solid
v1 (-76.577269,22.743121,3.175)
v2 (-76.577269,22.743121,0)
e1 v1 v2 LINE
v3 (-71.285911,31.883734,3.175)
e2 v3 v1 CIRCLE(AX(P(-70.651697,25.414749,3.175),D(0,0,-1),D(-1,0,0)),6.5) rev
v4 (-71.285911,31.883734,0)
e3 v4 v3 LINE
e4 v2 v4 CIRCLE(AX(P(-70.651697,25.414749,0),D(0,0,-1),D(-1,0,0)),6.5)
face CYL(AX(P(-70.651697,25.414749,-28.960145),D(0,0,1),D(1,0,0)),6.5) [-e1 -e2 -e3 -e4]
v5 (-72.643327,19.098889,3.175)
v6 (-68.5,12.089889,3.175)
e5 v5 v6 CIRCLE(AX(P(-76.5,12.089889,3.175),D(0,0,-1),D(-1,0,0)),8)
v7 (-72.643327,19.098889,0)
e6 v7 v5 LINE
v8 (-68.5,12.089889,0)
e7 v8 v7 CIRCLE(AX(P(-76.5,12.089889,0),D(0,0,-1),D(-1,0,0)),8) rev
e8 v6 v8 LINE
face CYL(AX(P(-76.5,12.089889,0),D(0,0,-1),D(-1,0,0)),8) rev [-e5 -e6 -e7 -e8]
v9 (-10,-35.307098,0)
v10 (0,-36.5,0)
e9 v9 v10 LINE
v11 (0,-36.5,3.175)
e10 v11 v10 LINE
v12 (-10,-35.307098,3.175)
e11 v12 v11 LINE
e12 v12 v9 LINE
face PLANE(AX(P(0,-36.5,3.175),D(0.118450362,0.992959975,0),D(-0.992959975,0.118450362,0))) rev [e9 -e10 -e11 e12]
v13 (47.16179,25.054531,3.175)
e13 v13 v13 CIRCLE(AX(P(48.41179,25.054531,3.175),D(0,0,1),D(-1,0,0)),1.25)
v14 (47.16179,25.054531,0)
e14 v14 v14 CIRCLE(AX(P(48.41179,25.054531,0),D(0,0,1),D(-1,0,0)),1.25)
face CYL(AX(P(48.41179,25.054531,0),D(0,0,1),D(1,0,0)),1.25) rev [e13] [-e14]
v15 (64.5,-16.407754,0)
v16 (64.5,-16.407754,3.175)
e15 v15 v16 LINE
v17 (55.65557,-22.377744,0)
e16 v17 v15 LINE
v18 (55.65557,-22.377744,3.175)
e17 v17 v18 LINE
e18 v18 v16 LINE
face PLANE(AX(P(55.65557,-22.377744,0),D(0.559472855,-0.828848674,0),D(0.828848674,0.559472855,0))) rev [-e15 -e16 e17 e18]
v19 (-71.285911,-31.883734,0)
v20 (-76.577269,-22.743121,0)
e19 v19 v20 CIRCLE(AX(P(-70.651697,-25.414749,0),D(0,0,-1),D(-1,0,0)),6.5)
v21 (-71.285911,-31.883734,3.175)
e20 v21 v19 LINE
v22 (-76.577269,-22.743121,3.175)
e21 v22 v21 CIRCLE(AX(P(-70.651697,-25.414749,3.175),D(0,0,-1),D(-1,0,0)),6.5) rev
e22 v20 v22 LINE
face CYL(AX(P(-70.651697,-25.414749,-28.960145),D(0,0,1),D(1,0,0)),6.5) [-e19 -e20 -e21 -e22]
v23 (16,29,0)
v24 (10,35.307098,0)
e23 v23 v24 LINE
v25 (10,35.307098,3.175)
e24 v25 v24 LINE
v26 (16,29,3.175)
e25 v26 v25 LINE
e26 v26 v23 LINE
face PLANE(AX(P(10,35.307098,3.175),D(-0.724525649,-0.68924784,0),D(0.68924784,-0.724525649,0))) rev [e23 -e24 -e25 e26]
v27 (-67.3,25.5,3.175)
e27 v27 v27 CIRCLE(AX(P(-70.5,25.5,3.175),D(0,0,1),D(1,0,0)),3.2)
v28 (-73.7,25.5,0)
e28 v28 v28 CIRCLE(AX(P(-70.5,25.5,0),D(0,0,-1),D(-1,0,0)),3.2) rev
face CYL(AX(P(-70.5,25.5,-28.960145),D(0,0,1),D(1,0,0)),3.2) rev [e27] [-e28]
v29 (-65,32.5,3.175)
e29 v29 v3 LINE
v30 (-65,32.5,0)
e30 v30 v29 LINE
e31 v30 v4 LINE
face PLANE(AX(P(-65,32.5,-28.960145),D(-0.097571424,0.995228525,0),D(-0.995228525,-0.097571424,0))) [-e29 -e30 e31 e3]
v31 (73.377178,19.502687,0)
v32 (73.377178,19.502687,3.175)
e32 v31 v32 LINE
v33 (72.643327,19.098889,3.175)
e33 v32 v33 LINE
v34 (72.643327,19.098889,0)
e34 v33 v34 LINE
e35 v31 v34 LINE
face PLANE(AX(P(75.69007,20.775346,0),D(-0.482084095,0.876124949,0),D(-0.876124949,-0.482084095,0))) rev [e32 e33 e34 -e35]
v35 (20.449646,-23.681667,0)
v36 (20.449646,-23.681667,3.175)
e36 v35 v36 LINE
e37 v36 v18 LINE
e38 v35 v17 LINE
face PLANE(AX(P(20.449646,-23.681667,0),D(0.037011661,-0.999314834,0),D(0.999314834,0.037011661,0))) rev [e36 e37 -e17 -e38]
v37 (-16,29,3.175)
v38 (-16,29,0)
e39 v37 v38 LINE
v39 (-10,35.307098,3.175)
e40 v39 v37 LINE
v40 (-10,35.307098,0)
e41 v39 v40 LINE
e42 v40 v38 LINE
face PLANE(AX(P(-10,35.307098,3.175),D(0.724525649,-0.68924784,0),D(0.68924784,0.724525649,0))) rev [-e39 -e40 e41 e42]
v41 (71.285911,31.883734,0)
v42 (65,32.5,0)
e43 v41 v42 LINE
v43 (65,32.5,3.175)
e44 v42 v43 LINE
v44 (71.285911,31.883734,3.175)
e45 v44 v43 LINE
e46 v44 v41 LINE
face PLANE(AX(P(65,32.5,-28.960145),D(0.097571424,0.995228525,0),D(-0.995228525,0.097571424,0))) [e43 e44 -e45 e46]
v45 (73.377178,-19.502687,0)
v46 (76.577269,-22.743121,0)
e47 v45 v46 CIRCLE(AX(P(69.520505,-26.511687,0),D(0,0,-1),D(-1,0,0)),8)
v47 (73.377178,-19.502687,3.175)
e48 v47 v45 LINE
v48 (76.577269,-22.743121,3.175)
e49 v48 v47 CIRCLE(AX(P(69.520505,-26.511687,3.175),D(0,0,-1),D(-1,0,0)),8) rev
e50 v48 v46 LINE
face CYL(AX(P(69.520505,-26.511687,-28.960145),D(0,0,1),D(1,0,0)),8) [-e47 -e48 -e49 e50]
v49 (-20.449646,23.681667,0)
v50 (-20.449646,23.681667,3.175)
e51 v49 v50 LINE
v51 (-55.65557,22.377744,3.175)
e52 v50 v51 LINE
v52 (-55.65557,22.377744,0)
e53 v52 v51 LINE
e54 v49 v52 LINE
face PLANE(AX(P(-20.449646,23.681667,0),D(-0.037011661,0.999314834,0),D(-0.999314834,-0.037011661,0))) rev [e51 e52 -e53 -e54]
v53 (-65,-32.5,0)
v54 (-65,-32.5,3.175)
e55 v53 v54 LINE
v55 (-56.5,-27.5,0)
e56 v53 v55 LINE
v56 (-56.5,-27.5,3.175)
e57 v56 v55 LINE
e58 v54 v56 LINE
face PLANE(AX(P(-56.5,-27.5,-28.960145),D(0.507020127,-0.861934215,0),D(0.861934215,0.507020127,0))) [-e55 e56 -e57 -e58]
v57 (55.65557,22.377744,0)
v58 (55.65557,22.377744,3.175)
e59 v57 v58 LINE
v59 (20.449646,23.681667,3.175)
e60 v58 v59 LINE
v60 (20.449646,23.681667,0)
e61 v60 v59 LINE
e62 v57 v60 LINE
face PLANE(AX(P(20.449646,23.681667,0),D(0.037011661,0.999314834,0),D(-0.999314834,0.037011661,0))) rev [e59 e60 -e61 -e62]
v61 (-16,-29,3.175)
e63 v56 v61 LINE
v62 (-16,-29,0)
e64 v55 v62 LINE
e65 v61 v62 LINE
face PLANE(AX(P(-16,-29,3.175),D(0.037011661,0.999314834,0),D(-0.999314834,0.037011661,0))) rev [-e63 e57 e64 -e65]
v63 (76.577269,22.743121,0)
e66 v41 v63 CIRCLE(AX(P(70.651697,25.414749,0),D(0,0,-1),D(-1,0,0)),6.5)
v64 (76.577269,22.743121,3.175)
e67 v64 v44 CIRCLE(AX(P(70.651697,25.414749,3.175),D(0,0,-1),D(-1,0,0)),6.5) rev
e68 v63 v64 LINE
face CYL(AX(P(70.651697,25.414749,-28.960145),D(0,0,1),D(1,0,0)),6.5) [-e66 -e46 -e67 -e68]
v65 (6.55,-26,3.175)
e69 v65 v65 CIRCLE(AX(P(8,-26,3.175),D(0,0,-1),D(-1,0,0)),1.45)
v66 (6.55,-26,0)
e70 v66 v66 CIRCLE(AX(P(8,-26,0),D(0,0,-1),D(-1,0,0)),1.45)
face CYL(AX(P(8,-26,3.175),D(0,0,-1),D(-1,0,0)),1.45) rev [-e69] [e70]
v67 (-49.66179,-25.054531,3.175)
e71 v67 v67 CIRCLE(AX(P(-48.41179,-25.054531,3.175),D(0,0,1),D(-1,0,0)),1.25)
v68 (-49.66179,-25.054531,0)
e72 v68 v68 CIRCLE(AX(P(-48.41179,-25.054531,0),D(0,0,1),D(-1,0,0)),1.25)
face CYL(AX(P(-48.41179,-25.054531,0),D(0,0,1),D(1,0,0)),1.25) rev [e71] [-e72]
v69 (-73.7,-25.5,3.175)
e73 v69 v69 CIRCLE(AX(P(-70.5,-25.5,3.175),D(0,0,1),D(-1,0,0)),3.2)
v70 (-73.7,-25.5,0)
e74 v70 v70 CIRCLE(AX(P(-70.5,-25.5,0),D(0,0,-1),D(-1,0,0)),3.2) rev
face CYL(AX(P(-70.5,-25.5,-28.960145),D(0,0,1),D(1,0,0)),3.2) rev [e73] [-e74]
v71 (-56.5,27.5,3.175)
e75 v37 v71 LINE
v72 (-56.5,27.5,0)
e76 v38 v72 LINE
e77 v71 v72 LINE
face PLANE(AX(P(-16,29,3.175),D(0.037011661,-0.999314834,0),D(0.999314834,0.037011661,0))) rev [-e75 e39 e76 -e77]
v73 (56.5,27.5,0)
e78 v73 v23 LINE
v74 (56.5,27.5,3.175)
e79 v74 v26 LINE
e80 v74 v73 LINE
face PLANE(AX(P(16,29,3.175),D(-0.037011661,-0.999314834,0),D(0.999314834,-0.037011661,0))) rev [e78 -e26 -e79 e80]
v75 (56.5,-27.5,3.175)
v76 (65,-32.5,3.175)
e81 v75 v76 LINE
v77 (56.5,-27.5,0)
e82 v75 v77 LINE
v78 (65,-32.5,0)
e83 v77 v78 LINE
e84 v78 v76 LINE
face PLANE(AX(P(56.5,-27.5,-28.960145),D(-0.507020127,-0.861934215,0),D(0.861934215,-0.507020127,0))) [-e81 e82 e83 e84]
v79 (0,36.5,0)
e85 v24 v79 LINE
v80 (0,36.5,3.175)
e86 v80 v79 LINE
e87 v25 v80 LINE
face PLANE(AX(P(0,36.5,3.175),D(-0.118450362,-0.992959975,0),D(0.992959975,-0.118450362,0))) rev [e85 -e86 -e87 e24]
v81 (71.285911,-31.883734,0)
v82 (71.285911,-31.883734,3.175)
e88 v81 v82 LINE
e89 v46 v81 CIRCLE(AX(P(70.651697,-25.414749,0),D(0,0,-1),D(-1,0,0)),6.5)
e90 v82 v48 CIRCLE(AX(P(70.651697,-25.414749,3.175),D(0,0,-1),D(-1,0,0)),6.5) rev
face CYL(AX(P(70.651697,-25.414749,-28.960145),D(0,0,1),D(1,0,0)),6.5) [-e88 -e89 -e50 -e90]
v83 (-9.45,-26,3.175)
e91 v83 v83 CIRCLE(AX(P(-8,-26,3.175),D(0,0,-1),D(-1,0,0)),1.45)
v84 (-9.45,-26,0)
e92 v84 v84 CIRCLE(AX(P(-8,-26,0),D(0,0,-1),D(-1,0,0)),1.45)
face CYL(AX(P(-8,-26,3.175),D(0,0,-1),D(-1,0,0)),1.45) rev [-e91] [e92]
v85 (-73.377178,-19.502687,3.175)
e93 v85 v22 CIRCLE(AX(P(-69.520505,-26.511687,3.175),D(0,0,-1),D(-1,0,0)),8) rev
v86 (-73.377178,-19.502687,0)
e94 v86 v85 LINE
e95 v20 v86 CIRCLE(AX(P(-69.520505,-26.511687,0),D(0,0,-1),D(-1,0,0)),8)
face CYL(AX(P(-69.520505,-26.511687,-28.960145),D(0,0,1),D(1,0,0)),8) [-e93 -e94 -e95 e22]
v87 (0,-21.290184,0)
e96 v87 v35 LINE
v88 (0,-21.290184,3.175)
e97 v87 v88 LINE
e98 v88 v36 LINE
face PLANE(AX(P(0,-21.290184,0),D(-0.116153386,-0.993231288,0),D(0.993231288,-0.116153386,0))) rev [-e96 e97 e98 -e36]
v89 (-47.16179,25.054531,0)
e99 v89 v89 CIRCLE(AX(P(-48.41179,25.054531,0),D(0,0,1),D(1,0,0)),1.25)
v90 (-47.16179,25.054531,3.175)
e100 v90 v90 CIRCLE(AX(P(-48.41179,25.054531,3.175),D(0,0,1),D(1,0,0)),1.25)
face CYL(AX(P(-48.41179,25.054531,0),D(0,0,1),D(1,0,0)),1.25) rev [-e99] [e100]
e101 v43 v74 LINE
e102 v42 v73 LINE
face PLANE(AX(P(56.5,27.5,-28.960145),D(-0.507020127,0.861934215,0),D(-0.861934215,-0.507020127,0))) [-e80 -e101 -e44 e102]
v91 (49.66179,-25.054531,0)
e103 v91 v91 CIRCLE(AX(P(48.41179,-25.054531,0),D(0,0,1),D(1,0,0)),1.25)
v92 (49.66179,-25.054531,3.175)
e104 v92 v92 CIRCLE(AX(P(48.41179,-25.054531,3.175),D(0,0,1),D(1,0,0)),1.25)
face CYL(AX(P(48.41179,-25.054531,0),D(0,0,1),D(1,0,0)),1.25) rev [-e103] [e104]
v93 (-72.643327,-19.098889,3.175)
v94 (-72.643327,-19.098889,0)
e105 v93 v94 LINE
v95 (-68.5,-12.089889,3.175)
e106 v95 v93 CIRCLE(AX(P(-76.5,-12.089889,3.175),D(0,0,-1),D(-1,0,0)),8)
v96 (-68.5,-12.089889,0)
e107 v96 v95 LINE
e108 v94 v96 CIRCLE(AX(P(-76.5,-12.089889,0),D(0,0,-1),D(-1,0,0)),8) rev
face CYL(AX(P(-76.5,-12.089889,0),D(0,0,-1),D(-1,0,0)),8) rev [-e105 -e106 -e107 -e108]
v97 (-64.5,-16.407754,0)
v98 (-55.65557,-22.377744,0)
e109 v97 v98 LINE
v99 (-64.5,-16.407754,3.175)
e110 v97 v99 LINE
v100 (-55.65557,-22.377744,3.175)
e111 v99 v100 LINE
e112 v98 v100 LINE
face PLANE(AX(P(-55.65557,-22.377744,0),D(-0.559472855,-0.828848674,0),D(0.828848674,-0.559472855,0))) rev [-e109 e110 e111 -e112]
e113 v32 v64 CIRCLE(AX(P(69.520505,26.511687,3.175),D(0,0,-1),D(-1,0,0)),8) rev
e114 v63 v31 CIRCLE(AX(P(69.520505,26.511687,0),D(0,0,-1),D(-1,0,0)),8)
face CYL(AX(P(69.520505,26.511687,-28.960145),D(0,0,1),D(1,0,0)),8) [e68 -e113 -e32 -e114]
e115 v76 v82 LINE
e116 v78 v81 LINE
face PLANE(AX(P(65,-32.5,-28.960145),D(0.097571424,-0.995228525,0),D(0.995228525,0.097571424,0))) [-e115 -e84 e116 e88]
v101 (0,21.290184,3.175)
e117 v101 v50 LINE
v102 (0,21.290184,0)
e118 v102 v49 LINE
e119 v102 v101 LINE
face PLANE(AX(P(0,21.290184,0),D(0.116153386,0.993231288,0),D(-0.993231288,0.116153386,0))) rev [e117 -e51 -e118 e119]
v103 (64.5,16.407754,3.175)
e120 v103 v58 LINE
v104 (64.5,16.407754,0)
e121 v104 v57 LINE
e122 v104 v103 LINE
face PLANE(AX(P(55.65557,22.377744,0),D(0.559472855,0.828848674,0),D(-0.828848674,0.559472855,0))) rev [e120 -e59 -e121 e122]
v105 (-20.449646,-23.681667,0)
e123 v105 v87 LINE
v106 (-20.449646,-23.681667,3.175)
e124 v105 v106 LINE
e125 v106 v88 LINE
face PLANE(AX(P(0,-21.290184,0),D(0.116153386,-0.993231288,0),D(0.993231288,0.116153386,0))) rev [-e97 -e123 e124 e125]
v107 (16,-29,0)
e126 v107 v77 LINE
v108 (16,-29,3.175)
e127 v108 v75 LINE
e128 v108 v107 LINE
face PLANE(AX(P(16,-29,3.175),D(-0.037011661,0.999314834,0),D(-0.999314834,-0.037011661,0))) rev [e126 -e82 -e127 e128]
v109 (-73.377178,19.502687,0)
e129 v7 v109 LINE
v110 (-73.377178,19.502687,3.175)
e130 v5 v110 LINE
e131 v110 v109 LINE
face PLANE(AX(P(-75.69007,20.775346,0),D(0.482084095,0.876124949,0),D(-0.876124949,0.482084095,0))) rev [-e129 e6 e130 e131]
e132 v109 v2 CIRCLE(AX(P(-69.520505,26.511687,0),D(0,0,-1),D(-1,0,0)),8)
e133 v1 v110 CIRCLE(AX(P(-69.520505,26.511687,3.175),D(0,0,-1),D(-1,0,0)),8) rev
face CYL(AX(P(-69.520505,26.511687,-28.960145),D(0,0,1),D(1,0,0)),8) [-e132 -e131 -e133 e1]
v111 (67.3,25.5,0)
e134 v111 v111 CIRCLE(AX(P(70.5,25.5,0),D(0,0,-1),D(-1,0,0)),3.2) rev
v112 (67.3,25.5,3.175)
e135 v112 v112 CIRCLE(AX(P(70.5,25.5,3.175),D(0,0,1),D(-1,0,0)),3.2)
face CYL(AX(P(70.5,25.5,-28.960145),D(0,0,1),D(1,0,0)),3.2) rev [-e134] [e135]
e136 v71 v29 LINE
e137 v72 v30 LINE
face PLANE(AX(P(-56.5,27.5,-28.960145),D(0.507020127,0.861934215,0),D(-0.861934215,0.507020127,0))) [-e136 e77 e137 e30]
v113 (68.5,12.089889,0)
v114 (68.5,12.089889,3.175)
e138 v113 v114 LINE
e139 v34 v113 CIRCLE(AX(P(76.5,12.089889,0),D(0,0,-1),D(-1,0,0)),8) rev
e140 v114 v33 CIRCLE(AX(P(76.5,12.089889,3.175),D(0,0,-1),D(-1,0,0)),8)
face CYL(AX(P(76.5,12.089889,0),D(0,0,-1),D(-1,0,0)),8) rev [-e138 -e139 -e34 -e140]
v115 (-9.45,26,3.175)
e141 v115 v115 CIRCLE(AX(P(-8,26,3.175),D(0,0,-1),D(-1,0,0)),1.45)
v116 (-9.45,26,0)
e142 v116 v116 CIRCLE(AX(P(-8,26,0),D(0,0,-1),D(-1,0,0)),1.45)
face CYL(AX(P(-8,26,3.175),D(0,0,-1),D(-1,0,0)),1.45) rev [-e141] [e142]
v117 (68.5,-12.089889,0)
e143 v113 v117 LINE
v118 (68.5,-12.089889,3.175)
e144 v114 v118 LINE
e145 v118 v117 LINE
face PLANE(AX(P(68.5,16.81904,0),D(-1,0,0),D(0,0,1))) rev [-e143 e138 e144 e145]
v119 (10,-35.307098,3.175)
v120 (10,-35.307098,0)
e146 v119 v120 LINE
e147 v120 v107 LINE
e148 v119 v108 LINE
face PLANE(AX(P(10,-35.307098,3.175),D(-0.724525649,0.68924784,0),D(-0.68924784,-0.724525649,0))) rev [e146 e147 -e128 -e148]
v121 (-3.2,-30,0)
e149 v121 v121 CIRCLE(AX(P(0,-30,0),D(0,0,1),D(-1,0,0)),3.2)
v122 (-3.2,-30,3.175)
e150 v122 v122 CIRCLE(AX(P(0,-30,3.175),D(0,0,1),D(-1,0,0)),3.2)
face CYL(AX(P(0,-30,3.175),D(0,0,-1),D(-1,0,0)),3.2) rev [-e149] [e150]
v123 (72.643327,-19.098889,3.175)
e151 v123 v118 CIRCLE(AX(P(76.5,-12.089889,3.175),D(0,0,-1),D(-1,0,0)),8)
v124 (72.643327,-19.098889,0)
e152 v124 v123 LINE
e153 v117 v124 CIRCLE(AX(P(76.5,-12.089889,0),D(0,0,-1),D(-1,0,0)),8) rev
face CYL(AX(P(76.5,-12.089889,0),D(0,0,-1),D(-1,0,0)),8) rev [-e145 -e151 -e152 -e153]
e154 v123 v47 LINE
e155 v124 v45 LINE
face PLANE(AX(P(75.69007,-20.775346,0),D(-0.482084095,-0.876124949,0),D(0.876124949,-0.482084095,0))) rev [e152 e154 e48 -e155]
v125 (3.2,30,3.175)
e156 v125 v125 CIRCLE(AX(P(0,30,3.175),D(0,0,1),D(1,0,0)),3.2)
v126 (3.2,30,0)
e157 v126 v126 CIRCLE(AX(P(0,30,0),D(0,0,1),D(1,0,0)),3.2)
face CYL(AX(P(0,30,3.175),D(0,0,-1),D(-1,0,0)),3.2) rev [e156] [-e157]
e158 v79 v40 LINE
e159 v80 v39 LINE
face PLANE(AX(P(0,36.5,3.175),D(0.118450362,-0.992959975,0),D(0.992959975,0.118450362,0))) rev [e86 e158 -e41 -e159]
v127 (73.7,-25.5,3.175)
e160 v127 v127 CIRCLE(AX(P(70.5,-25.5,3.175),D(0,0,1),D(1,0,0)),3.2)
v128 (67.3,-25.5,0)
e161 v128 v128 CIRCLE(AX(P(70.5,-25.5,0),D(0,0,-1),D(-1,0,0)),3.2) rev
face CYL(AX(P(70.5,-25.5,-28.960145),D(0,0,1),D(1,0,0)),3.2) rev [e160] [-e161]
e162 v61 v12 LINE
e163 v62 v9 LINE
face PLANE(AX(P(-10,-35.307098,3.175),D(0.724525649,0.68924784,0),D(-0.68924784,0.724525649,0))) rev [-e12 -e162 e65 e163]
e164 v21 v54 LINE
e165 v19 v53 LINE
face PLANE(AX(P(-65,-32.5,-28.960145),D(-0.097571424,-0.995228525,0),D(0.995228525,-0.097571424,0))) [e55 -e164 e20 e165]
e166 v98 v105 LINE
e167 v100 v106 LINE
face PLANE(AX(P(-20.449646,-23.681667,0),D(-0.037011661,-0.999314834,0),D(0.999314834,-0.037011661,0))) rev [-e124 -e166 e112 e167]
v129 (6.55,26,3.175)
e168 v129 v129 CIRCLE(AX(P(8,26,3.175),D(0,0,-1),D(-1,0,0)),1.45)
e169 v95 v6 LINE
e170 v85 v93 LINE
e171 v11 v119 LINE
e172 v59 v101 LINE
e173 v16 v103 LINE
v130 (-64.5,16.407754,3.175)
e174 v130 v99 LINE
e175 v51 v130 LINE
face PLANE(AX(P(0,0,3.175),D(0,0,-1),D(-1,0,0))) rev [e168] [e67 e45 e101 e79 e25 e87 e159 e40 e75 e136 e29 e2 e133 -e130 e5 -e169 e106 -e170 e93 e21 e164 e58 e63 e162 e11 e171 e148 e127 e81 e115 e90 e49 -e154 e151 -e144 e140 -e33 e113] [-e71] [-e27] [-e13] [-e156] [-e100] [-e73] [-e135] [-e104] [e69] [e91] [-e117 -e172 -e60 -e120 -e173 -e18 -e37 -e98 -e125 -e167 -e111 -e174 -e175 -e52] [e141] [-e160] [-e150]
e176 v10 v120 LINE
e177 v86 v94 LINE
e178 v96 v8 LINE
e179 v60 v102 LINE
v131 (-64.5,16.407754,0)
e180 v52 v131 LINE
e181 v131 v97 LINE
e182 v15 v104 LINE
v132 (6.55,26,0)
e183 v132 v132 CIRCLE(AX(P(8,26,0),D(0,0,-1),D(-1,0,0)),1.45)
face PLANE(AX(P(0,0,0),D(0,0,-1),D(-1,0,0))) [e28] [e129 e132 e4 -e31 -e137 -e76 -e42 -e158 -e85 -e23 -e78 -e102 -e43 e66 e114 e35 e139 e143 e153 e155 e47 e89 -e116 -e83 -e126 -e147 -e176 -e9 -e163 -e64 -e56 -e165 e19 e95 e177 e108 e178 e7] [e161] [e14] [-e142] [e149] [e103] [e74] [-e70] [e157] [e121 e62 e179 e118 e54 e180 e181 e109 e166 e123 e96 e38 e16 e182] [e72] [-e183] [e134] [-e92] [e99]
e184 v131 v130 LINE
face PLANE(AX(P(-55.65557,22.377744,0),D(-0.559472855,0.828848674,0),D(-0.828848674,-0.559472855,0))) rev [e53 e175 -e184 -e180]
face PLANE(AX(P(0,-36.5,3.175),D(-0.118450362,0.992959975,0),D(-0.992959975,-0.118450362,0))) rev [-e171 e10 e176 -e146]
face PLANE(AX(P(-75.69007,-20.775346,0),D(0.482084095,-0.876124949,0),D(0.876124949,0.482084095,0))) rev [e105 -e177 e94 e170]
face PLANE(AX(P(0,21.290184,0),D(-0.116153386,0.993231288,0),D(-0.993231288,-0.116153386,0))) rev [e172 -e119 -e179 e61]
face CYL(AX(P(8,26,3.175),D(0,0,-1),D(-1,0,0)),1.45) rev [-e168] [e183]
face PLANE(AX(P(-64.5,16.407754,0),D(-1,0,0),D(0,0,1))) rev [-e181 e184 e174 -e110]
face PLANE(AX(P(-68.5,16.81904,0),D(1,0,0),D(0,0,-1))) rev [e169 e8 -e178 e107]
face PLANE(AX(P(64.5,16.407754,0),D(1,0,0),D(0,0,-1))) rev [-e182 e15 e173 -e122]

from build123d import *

# Parameters (mm, degrees)
SKETCH1_R           = 3.2
BOSS_EXTRUDE1_DEPTH = 3.175
SKETCH3_R           = 3.2
BOSS_EXTRUDE2_DEPTH = 3.175
FILLET1_R           = 6.5
SKETCH6_R           = 1.45
CUT_EXTRUDE4_DEPTH  = 86.409103367
CUT_EXTRUDE14_DEPTH = 86.409103367
CUT_EXTRUDE13_DEPTH = 86.409103367
FILLET2_R           = 8
SKETCH9_R           = 1.25
CUT_EXTRUDE15_DEPTH = 86.409103367


with BuildPart() as part:
    # Sketch1 → Boss-Extrude1 (new body)
    with BuildSketch(Plane.XY):
        Polygon((0, 36.5), (-10, 35.30709832), (-16, 29), (-56.5, 27.5), (-76.5, 14), (-76.5, -14), (-56.5, -27.5), (-16, -29), (-10, -35.30709832), (0, -36.5), (10, -35.30709832), (16, -29), (56.5, -27.5), (76.5, -14), (76.5, 14), (56.5, 27.5), (16, 29), (10, 35.30709832), align=None)
        with Locations((0, 30)):
            Circle(SKETCH1_R, mode=Mode.SUBTRACT)
        with Locations(Location((0, -30, 0), (0, 0, 180))):
            Circle(SKETCH1_R, mode=Mode.SUBTRACT)
    extrude(amount=BOSS_EXTRUDE1_DEPTH)

    # Sketch3 → Boss-Extrude2 (add)
    # profile 1 of 4: a face of its own
    with BuildSketch(Plane.XY.offset(3.175)):
        Polygon((-56.5, 27.5), (-65, 32.5), (-80.3, 31), (-73.537037037, 16), align=None)
        with Locations((-70.5, 25.5)):
            Circle(SKETCH3_R, mode=Mode.SUBTRACT)
    # profile 2 of 4: a face of its own
    with BuildSketch(Plane.XY.offset(3.175)):
        Polygon((73.537037037, 16), (56.5, 27.5), (65, 32.5), (80.3, 31), align=None)
        with Locations(Location((70.5, 25.5, 0), (0, 0, 180))):
            Circle(SKETCH3_R, mode=Mode.SUBTRACT)
    # profile 3 of 4: a face of its own
    with BuildSketch(Plane.XY.offset(3.175)):
        Polygon((56.5, -27.5), (65, -32.5), (80.3, -31), (73.537037037, -16), align=None)
        with Locations((70.5, -25.5)):
            Circle(SKETCH3_R, mode=Mode.SUBTRACT)
    # profile 4 of 4: a face of its own
    with BuildSketch(Plane.XY.offset(3.175)):
        Polygon((-73.537037037, -16), (-56.5, -27.5), (-65, -32.5), (-80.3, -31), align=None)
        with Locations(Location((-70.5, -25.5, 0), (0, 0, 180))):
            Circle(SKETCH3_R, mode=Mode.SUBTRACT)
    extrude(amount=-BOSS_EXTRUDE2_DEPTH)

    # Fillet1
    fillet1_edges = [part.edges().sort_by_distance(p)[0] for p in [
        (-80.3, 31, 1.5875),
        (80.3, 31, 1.5875),
        (80.3, -31, 1.5875),
        (-80.3, -31, 1.5875),
    ]]
    fillet(fillet1_edges, radius=FILLET1_R)

    # Sketch6 → Cut-Extrude4 (cut, through all)
    with BuildSketch(Plane(origin=(0, 0, 0), x_dir=(-1, 0, 0), z_dir=(0, 0, -1))):
        with Locations((8, 26)):
            Circle(SKETCH6_R)
        with Locations((-8, 26)):
            Circle(SKETCH6_R)
        with Locations((-8, -26)):
            Circle(SKETCH6_R)
        with Locations((8, -26)):
            Circle(SKETCH6_R)
    extrude(amount=-CUT_EXTRUDE4_DEPTH, mode=Mode.SUBTRACT)

    # Sketch8 → Cut-Extrude14 (cut, through all)
    with BuildSketch(Plane.XY.offset(3.175)):
        Polygon((-75.690069736, 20.775346347), (-68.5, 16.819040498), (-68.5, -16.819040498), (-75.690069736, -20.775346347), (-83.497643109, -20.775346347), (-83.497643109, 20.775346347), align=None)
        Polygon((75.690069736, -20.775346347), (68.5, -16.819040498), (68.5, 16.819040498), (75.690069736, 20.775346347), (83.497643109, 20.775346347), (83.497643109, -20.775346347), align=None)
    extrude(amount=-CUT_EXTRUDE14_DEPTH, mode=Mode.SUBTRACT)

    # Sketch7 → Cut-Extrude13 (cut, through all)
    with BuildSketch(Plane.XY.offset(3.175)):
        Polygon((0, 21.290184322), (-20.449646359, 23.681667258), (-55.655570018, 22.377744159), (-64.5, 16.407753921), (-64.5, -16.407753921), (-55.655570018, -22.377744159), (-20.449646359, -23.681667258), (0, -21.290184322), (20.449646359, -23.681667258), (55.655570018, -22.377744159), (64.5, -16.407753921), (64.5, 16.407753921), (55.655570018, 22.377744159), (20.449646359, 23.681667258), align=None)
    extrude(amount=-CUT_EXTRUDE13_DEPTH, mode=Mode.SUBTRACT)

    # Fillet2
    # the kernel refuses this fillet: 8 mm, written as the material it adds along each edge
    with BuildSketch(Plane(origin=(68.5, 16.819040498, 3.175), x_dir=(0.8761249486576493, 0.48208409467605473, 0), z_dir=(0, 0, -1)), Plane(origin=(68.5, -16.819040498, 3.175), x_dir=(0, 1, 0), z_dir=(0, 0, -1))) as fillet2_piece_1:
        with BuildLine():
            CenterArc((FILLET2_R * 0.591143884348, FILLET2_R), FILLET2_R, 208.821606211, 61.178393789)
            Line((-FILLET2_R * 0.284981064309, FILLET2_R * 0.517915905324), (0, 0))
            Line((0, 0), (FILLET2_R * 0.591143884348, 0))
        make_face()
    extrude(amount=3.175)
    with BuildSketch(Plane(origin=(-68.5, -16.819040498, 3.175), x_dir=(0, 1, 0), z_dir=(0, 0, -1)), Plane(origin=(-68.5, 16.819040498, 3.175), x_dir=(-0.8761249486576493, 0.48208409467605473, 0), z_dir=(0, 0, -1))) as fillet2_piece_2:
        with BuildLine():
            CenterArc((FILLET2_R * 0.591143884348, -FILLET2_R), FILLET2_R, 90, 61.178393789)
            Line((-FILLET2_R * 0.284981064309, -FILLET2_R * 0.517915905324), (0, 0))
            Line((0, 0), (FILLET2_R * 0.591143884348, 0))
        make_face()
    extrude(amount=3.175)
    # the kernel refuses this fillet: 8 mm, written as the material it takes off along each edge
    with BuildSketch(Plane(origin=(75.690069736, 20.775346347, 9.774776334), x_dir=(0.4110197276210946, 0.911626449542948, 0), z_dir=(0, 0, -1))) as fillet2_2_piece_1:
        with BuildLine():
            CenterArc((2.693587302, -7.982087138), FILLET2_R, 93.834919038, 33.074566144)
            Line((-2.110833522, -1.585405143), (0, 0))
            Line((0, 0), (2.158531299, 0))
        make_face()
    extrude(amount=16.374552669, mode=Mode.SUBTRACT)
    with BuildSketch(Plane(origin=(75.690069736, -20.775346347, 9.774776334), x_dir=(-0.8761249486576492, 0.48208409467605506, 0), z_dir=(0, 0, -1))) as fillet2_2_piece_2:
        with BuildLine():
            CenterArc((2.639910534, -8), FILLET2_R, 90, 33.074566144)
            Line((-1.725929787, -1.29631159), (0, 0))
            Line((0, 0), (2.639910534, 0))
        make_face()
    extrude(amount=16.374552669, mode=Mode.SUBTRACT)
    with BuildSketch(Plane(origin=(-75.690069736, -20.775346347, 9.774776334), x_dir=(0.8761249486576499, 0.48208409467605357, 0), z_dir=(0, 0, -1))) as fillet2_2_piece_3:
        with BuildLine():
            CenterArc((2.639910534, 8), FILLET2_R, 236.925433856, 33.074566144)
            Line((-1.725929787, 1.29631159), (0, 0))
            Line((0, 0), (2.639910534, 0))
        make_face()
    extrude(amount=16.374552669, mode=Mode.SUBTRACT)
    with BuildSketch(Plane(origin=(-75.690069736, 20.775346347, 9.774776334), x_dir=(-0.4110197276210959, 0.9116264495429475, 0), z_dir=(0, 0, -1))) as fillet2_2_piece_4:
        with BuildLine():
            CenterArc((2.693587302, 7.982087138), FILLET2_R, 233.090514818, 33.074566144)
            Line((-2.110833522, 1.585405143), (0, 0))
            Line((0, 0), (2.158531299, 0))
        make_face()
    extrude(amount=16.374552669, mode=Mode.SUBTRACT)

    # Sketch9 → Cut-Extrude15 (cut, through all)
    with BuildSketch(Plane.XY.offset(3.175)):
        with Locations((-48.411790338, 25.054530897)):
            Circle(SKETCH9_R)
        with Locations(Location((48.411790338, 25.054530897, 0), (0, 0, 180))):
            Circle(SKETCH9_R)
        with Locations(Location((-48.411790338, -25.054530897, 0), (0, 0, 180))):
            Circle(SKETCH9_R)
        with Locations((48.411790338, -25.054530897)):
            Circle(SKETCH9_R)
    extrude(amount=-CUT_EXTRUDE15_DEPTH, mode=Mode.SUBTRACT)


solid = part.part
